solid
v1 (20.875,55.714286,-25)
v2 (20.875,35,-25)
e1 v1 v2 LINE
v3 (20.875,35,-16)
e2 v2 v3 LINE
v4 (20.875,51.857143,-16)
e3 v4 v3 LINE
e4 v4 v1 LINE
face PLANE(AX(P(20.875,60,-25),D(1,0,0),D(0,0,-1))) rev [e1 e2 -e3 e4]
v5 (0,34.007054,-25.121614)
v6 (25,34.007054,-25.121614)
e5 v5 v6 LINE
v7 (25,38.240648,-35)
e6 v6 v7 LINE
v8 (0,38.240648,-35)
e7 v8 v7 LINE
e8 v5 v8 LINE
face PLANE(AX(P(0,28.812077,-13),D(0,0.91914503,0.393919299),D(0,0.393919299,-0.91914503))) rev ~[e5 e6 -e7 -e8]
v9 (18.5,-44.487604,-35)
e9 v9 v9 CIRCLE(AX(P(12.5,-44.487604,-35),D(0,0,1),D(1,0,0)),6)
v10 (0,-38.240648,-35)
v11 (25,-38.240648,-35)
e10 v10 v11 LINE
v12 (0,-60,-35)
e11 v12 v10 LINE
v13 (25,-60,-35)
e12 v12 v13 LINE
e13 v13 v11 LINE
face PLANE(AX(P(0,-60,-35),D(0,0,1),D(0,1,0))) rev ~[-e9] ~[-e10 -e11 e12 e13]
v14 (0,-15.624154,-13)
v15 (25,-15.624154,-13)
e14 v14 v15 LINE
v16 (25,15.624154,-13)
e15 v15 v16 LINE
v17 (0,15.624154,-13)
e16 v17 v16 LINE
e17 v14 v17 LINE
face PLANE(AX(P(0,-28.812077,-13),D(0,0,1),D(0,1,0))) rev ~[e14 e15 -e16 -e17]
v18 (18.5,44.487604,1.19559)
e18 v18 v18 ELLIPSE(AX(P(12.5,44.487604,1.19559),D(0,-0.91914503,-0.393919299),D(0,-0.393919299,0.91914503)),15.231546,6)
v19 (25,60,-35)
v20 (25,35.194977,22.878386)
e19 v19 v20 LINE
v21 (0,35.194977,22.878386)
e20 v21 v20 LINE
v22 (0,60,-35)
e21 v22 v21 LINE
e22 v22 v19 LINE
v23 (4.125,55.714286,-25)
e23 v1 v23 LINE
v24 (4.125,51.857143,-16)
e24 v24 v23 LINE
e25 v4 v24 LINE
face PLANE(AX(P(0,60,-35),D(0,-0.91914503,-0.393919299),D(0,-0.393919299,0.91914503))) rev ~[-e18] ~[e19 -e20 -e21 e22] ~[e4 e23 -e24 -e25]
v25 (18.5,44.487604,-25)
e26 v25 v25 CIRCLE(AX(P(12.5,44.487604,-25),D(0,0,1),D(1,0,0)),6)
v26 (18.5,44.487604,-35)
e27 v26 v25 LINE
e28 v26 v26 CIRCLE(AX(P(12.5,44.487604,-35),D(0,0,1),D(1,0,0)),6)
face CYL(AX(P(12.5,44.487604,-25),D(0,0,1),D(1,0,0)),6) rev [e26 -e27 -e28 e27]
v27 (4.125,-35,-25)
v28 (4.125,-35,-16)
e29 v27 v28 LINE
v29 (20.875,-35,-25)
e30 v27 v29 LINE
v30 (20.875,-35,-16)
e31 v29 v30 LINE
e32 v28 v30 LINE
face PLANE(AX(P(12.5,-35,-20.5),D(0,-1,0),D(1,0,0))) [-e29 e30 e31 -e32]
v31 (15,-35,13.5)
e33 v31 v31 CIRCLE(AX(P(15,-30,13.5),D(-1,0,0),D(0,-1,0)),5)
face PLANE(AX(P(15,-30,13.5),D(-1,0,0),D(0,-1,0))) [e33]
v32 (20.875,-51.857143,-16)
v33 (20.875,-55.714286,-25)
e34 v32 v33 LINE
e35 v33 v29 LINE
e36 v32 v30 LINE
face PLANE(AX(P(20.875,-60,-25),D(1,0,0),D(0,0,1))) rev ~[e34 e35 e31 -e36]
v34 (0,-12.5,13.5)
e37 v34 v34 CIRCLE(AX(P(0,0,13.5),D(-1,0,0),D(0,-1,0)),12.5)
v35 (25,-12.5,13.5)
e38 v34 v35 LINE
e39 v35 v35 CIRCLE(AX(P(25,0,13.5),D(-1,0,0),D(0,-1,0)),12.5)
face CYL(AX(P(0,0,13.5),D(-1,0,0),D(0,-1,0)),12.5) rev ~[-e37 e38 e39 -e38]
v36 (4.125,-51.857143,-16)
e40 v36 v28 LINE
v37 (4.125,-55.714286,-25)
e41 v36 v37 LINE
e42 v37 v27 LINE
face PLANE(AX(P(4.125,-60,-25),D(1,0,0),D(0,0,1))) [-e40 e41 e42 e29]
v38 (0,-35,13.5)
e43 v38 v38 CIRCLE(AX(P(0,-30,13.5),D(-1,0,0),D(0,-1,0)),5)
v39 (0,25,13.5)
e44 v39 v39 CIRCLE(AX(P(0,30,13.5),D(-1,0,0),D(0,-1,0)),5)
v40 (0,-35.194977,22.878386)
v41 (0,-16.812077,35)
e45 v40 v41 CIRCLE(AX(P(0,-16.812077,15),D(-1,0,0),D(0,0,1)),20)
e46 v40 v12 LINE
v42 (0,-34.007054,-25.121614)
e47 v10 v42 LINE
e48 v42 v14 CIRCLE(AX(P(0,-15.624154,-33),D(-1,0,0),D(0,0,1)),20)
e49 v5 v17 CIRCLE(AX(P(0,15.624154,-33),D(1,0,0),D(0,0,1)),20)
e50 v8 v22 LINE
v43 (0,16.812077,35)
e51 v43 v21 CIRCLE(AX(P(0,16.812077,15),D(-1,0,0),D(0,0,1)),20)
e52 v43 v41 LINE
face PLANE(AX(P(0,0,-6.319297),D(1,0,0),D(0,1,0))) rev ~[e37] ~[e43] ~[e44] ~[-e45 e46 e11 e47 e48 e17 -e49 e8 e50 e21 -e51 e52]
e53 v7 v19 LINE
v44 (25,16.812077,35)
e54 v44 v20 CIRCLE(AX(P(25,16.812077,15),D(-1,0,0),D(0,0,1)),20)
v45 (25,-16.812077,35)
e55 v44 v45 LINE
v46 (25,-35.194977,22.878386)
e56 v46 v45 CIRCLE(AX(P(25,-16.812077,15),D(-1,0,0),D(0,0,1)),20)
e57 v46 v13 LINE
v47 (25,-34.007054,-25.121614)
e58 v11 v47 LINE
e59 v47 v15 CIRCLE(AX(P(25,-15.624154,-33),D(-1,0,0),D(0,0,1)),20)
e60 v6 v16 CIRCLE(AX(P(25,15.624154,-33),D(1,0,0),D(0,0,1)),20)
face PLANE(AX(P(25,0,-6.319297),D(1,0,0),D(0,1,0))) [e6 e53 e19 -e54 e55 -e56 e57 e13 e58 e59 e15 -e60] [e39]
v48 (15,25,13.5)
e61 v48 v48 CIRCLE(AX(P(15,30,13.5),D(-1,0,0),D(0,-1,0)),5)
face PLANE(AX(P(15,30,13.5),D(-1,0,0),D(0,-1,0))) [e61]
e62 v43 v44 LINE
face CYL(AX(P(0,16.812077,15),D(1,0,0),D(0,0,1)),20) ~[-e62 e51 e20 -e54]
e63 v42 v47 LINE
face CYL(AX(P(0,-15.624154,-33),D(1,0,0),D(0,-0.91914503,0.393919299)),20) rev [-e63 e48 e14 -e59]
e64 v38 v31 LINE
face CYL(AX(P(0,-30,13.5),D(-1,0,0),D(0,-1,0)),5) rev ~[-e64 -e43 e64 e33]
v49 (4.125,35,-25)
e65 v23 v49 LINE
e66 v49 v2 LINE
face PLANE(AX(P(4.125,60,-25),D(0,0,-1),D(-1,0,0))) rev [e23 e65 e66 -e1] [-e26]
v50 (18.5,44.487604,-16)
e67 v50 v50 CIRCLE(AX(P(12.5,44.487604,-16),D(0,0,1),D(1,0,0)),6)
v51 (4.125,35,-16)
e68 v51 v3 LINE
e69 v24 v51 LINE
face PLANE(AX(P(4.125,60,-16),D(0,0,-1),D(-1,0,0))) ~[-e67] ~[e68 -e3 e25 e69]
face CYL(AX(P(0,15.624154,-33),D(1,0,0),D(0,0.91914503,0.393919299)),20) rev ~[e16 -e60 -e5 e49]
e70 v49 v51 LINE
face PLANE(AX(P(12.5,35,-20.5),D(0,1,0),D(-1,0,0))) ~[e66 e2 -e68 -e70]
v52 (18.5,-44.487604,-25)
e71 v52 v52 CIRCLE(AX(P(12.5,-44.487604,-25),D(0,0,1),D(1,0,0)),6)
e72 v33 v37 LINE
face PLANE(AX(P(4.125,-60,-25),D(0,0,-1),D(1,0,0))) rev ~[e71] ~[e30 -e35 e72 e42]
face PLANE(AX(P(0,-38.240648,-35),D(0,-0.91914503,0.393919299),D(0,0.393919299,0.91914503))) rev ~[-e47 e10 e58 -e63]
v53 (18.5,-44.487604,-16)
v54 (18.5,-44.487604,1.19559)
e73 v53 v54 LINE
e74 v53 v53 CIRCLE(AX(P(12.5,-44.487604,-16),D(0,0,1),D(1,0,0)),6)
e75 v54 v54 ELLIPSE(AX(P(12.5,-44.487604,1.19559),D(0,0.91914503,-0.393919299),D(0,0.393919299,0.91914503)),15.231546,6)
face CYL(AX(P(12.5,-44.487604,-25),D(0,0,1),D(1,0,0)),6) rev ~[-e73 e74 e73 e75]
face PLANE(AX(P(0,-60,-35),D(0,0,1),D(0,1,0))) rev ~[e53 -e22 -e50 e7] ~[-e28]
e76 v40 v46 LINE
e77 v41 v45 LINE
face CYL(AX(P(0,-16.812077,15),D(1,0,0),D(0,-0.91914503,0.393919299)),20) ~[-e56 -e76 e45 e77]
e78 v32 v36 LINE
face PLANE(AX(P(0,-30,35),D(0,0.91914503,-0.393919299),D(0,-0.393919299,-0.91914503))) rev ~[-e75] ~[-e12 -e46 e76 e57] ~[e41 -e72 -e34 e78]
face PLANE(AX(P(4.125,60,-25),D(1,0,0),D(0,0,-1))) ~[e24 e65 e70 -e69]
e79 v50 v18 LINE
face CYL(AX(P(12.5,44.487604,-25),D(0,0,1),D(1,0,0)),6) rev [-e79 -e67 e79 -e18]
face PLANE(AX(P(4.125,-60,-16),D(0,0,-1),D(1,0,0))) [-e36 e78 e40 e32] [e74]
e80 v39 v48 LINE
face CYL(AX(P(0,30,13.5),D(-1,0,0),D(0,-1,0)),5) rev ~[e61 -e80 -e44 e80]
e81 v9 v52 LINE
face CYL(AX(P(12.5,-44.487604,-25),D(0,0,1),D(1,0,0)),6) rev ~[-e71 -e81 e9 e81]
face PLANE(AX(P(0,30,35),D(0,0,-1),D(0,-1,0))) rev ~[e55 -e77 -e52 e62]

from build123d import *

# Parameters (mm, degrees)
F1_DEPTH  = 25
F2_R      = 5
F3_DEPTH  = 15
F5_DEPTH  = 25
F7_W      = 16.75
F7_H      = 9
F8_DEPTH  = 25
F9_R      = 6
F10_DEPTH = 50
F11_R     = 20
F2_R_2    = 12.5
F12_DEPTH = 25


# Not quite as in the source:
# - a pattern or mirror of a feature is missing from the dataset's text; its kind, count and spacing are read off the source's solid


with BuildPart() as f1:
    # F0 (on Right) → F1 (new body)
    with BuildSketch(Plane.YZ):
        Polygon((-60, -35), (60, -35), (30, 35), (-30, 35), align=None)
    extrude(amount=F1_DEPTH)

    # F2 (on face) → F3 (cut)
    with BuildSketch(Plane(origin=(0, 0, 0), x_dir=(0, -1, 0), z_dir=(-1, 0, 0))):
        with Locations((-30, 13.5)):
            Circle(F2_R)
        with Locations((30, 13.5)):
            Circle(F2_R)
    extrude(amount=-F3_DEPTH, mode=Mode.SUBTRACT)

    # F4 (on face) → F5 (cut)
    with BuildSketch(Plane(origin=(0, 0, 0), x_dir=(0, -1, 0), z_dir=(-1, 0, 0))):
        Polygon((-28.8120768404, -13), (-38.240648269, -35), (38.240648269, -35), (28.8120768404, -13), align=None)
    extrude(amount=-F5_DEPTH, mode=Mode.SUBTRACT)

    # F7 (on offset) → F8 (cut)
    with BuildSketch(Plane.XZ.offset(60)):
        with Locations((12.5, -20.5)):
            Rectangle(F7_W, F7_H)
    f8 = extrude(amount=-F8_DEPTH, mode=Mode.SUBTRACT)

    # F8_copies: F8 across plane
    add(f8.mirror(Plane.ZX), mode=Mode.SUBTRACT)

    # F9 (on face) → F10 (cut, symmetric)
    with BuildSketch(Plane.XY.offset(-25)):
        with Locations((12.5, -44.487604307)):
            Circle(F9_R)
    f10 = extrude(amount=F10_DEPTH, both=True, mode=Mode.SUBTRACT)

    # F10_copies: F10 across plane
    add(f10.mirror(Plane.ZX), mode=Mode.SUBTRACT)

    # F11
    f11_edges = [f1.edges().sort_by_distance(p)[0] for p in [
        (12.5, -28.812077, -13),
        (12.5, 28.812077, -13),
        (12.5, 30, 35),
        (12.5, -30, 35),
    ]]
    fillet(f11_edges, radius=F11_R)

    # F2 (on face) → F12 (cut)
    with BuildSketch(Plane(origin=(0, 0, 0), x_dir=(0, -1, 0), z_dir=(-1, 0, 0))):
        with Locations((0, 13.5)):
            Circle(F2_R_2)
    extrude(amount=-F12_DEPTH, mode=Mode.SUBTRACT)


solid = f1.part
